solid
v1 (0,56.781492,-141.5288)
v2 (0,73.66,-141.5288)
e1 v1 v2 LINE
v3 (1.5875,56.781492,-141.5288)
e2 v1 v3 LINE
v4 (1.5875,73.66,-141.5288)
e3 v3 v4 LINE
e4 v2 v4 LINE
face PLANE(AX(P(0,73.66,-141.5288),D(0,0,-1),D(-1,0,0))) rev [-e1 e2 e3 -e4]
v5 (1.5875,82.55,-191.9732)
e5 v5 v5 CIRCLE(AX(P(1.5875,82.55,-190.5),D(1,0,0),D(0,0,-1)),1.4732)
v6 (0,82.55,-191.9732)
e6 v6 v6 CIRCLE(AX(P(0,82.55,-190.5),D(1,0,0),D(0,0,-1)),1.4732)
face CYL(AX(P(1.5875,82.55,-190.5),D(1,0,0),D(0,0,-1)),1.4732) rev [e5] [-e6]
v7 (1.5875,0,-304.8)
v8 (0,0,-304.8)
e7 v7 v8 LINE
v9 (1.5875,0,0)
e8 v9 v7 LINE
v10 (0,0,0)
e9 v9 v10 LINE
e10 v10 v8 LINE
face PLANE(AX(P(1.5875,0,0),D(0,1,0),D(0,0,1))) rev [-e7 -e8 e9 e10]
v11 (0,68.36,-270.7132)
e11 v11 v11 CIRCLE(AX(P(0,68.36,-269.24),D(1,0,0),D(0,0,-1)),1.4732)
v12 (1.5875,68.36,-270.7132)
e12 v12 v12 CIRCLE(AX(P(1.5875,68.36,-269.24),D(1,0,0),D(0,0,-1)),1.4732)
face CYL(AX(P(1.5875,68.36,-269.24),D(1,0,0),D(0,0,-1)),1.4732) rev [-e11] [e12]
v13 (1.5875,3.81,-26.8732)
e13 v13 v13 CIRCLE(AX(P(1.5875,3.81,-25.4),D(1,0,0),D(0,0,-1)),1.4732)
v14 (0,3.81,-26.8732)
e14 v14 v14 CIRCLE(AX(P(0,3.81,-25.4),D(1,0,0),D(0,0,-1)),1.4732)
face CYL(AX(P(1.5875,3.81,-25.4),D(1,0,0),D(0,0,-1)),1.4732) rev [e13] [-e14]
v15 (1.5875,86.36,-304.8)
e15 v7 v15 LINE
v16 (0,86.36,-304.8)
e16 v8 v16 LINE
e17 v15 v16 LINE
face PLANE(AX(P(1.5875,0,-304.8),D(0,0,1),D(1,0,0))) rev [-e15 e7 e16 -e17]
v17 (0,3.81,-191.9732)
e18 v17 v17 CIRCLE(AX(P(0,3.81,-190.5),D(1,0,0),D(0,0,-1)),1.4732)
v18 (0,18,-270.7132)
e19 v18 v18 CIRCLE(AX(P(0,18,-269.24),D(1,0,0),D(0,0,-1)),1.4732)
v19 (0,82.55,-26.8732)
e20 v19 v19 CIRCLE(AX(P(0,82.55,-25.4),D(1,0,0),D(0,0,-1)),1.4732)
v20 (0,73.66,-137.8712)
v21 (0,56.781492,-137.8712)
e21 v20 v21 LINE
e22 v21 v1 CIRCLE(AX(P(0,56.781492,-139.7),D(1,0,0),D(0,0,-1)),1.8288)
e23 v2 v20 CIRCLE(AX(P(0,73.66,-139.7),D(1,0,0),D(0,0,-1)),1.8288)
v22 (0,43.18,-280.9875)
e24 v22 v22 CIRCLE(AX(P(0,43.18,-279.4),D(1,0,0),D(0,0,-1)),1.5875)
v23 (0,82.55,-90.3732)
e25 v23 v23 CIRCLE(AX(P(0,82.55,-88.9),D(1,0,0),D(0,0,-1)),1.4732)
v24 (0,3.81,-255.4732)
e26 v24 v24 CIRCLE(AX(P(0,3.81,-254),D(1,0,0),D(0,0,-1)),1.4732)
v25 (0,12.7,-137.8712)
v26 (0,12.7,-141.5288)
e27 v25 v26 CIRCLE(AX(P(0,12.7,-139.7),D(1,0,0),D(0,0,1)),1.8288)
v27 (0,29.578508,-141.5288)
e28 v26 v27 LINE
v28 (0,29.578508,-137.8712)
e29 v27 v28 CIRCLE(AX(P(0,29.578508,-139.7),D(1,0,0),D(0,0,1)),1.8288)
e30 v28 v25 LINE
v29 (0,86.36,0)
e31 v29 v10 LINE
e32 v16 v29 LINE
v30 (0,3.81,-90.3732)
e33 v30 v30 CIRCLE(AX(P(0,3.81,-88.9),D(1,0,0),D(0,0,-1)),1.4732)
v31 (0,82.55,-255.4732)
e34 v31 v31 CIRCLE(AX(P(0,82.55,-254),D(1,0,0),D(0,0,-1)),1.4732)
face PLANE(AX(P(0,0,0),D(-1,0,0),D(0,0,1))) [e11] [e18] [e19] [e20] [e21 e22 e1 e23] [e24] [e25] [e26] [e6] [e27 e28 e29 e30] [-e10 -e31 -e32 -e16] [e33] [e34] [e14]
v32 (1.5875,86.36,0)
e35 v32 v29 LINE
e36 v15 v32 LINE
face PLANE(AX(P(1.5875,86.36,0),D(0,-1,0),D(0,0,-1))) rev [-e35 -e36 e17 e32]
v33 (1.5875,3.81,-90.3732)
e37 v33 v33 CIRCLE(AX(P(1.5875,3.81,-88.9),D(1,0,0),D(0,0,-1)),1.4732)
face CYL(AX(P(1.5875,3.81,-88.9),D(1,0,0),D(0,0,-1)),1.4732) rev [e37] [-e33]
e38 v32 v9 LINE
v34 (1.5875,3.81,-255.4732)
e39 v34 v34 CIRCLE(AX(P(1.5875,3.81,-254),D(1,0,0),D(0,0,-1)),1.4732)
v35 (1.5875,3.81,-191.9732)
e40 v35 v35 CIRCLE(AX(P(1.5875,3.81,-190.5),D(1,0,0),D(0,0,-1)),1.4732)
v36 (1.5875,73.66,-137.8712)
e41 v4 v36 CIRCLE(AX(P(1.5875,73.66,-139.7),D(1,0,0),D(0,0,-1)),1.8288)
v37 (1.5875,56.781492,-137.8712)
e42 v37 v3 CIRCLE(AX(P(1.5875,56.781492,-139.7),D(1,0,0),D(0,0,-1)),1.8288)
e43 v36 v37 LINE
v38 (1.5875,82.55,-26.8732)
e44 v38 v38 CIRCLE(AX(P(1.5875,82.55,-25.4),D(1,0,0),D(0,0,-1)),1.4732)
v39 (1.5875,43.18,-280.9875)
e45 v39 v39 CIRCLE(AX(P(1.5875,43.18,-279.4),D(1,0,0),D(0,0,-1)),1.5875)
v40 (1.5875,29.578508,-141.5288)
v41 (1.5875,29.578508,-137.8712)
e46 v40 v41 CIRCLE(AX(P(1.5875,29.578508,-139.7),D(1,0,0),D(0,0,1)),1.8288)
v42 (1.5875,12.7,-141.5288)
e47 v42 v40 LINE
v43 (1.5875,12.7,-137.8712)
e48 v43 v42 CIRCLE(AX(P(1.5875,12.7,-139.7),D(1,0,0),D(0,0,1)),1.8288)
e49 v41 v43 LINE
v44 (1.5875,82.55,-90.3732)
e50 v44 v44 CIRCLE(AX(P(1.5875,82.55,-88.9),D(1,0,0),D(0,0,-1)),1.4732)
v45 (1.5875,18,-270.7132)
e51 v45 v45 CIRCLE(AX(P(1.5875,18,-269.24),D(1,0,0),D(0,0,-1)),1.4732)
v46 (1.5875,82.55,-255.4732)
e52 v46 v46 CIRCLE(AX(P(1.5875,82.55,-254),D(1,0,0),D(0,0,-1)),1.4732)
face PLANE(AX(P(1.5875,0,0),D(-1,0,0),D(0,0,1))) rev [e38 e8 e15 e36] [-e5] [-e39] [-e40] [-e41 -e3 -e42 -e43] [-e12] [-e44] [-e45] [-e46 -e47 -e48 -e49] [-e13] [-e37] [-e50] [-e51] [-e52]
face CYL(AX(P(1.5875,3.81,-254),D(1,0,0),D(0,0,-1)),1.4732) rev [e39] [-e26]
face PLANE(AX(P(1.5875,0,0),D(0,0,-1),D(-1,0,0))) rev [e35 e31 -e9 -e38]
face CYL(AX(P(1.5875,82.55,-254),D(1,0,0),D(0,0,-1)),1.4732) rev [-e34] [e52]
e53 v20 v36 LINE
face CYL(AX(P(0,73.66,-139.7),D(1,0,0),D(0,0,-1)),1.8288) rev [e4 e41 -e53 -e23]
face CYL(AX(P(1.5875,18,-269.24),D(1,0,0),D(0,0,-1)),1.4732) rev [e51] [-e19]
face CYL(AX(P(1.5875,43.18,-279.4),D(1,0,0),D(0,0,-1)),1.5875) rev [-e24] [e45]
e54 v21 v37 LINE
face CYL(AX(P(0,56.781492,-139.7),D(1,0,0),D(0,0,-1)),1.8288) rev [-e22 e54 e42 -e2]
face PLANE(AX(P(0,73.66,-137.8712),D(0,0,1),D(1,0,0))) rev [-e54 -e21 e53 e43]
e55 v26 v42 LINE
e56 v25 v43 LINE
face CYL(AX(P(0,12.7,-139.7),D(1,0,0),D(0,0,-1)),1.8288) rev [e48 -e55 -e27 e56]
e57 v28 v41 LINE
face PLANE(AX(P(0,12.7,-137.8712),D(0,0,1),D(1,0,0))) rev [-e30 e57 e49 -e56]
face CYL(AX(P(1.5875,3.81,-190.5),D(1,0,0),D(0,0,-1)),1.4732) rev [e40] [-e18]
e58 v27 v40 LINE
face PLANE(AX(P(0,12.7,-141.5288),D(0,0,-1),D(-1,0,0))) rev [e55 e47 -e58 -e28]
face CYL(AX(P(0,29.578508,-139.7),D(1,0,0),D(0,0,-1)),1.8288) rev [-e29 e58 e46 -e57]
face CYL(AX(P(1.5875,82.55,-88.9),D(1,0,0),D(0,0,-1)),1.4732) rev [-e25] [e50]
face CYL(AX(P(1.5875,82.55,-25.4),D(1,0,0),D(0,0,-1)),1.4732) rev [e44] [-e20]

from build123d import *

# Parameters (mm, degrees)
SKETCH1_W                     = 304.8
SKETCH1_H                     = 86.36
BOSS_EXTRUDE1_DEPTH           = 1.5875
F_4_CLEARANCE_HOLE1_OUTLINE_R = 1.4732
F_4_CLEARANCE_HOLE1_DEPTH     = 1.5875
F_1_8_0_125_DIAMETER_HOLE1_D  = 3.175
CUT_EXTRUDE1_DEPTH            = 317.802161855


# Read off the part's stored shape, not the designer's step: #4 Clearance Hole1
with BuildPart() as part:
    # Sketch1 → Boss-Extrude1 (new body)
    with BuildSketch(Plane(origin=(0, 0, 0), x_dir=(0, 0, -1), z_dir=(1, 0, 0))):
        with Locations((152.4, 43.18)):
            Rectangle(SKETCH1_W, SKETCH1_H)
    extrude(amount=BOSS_EXTRUDE1_DEPTH)

    # #4 Clearance Hole1 outline → #4 Clearance Hole1 (cut)
    with BuildSketch(Plane.YZ):
        with Locations((68.36, -269.24)):
            Circle(F_4_CLEARANCE_HOLE1_OUTLINE_R)
        with Locations((18, -269.24)):
            Circle(F_4_CLEARANCE_HOLE1_OUTLINE_R)
        with Locations((82.55, -25.4)):
            Circle(F_4_CLEARANCE_HOLE1_OUTLINE_R)
        with Locations((82.55, -88.9)):
            Circle(F_4_CLEARANCE_HOLE1_OUTLINE_R)
        with Locations((82.55, -190.5)):
            Circle(F_4_CLEARANCE_HOLE1_OUTLINE_R)
        with Locations((82.55, -254)):
            Circle(F_4_CLEARANCE_HOLE1_OUTLINE_R)
        with Locations((3.81, -254)):
            Circle(F_4_CLEARANCE_HOLE1_OUTLINE_R)
        with Locations((3.81, -190.5)):
            Circle(F_4_CLEARANCE_HOLE1_OUTLINE_R)
        with Locations((3.81, -88.9)):
            Circle(F_4_CLEARANCE_HOLE1_OUTLINE_R)
        with Locations((3.81, -25.4)):
            Circle(F_4_CLEARANCE_HOLE1_OUTLINE_R)
    extrude(amount=F_4_CLEARANCE_HOLE1_DEPTH, mode=Mode.SUBTRACT)

    # 1/8 (0.125) Diameter Hole1 (through all)
    with Locations(Plane(origin=(1.5875, 0, 0), x_dir=(0, 0, -1), z_dir=(1, 0, 0))):
        with Locations((279.4, 43.18)):
            Hole(F_1_8_0_125_DIAMETER_HOLE1_D / 2)

    # Sketch6 → Cut-Extrude1 (cut, through all)
    with BuildSketch(Plane(origin=(1.5875, 0, 0), x_dir=(0, 0, -1), z_dir=(1, 0, 0))):
        with BuildLine():
            Line((141.5288, 73.66), (141.5288, 56.781492032))
            ThreePointArc((141.5288, 56.781492032), (139.7, 54.952692032), (137.8712, 56.781492032))
            Line((137.8712, 56.781492032), (137.8712, 73.66))
            ThreePointArc((137.8712, 73.66), (139.7, 75.4888), (141.5288, 73.66))
        make_face()
        with BuildLine():
            Line((141.5288, 12.7), (141.5288, 29.578507968))
            ThreePointArc((141.5288, 29.578507968), (139.7, 31.407307968), (137.8712, 29.578507968))
            Line((137.8712, 29.578507968), (137.8712, 12.7))
            ThreePointArc((137.8712, 12.7), (139.7, 10.8712), (141.5288, 12.7))
        make_face()
    extrude(amount=-CUT_EXTRUDE1_DEPTH, mode=Mode.SUBTRACT)


solid = part.part
